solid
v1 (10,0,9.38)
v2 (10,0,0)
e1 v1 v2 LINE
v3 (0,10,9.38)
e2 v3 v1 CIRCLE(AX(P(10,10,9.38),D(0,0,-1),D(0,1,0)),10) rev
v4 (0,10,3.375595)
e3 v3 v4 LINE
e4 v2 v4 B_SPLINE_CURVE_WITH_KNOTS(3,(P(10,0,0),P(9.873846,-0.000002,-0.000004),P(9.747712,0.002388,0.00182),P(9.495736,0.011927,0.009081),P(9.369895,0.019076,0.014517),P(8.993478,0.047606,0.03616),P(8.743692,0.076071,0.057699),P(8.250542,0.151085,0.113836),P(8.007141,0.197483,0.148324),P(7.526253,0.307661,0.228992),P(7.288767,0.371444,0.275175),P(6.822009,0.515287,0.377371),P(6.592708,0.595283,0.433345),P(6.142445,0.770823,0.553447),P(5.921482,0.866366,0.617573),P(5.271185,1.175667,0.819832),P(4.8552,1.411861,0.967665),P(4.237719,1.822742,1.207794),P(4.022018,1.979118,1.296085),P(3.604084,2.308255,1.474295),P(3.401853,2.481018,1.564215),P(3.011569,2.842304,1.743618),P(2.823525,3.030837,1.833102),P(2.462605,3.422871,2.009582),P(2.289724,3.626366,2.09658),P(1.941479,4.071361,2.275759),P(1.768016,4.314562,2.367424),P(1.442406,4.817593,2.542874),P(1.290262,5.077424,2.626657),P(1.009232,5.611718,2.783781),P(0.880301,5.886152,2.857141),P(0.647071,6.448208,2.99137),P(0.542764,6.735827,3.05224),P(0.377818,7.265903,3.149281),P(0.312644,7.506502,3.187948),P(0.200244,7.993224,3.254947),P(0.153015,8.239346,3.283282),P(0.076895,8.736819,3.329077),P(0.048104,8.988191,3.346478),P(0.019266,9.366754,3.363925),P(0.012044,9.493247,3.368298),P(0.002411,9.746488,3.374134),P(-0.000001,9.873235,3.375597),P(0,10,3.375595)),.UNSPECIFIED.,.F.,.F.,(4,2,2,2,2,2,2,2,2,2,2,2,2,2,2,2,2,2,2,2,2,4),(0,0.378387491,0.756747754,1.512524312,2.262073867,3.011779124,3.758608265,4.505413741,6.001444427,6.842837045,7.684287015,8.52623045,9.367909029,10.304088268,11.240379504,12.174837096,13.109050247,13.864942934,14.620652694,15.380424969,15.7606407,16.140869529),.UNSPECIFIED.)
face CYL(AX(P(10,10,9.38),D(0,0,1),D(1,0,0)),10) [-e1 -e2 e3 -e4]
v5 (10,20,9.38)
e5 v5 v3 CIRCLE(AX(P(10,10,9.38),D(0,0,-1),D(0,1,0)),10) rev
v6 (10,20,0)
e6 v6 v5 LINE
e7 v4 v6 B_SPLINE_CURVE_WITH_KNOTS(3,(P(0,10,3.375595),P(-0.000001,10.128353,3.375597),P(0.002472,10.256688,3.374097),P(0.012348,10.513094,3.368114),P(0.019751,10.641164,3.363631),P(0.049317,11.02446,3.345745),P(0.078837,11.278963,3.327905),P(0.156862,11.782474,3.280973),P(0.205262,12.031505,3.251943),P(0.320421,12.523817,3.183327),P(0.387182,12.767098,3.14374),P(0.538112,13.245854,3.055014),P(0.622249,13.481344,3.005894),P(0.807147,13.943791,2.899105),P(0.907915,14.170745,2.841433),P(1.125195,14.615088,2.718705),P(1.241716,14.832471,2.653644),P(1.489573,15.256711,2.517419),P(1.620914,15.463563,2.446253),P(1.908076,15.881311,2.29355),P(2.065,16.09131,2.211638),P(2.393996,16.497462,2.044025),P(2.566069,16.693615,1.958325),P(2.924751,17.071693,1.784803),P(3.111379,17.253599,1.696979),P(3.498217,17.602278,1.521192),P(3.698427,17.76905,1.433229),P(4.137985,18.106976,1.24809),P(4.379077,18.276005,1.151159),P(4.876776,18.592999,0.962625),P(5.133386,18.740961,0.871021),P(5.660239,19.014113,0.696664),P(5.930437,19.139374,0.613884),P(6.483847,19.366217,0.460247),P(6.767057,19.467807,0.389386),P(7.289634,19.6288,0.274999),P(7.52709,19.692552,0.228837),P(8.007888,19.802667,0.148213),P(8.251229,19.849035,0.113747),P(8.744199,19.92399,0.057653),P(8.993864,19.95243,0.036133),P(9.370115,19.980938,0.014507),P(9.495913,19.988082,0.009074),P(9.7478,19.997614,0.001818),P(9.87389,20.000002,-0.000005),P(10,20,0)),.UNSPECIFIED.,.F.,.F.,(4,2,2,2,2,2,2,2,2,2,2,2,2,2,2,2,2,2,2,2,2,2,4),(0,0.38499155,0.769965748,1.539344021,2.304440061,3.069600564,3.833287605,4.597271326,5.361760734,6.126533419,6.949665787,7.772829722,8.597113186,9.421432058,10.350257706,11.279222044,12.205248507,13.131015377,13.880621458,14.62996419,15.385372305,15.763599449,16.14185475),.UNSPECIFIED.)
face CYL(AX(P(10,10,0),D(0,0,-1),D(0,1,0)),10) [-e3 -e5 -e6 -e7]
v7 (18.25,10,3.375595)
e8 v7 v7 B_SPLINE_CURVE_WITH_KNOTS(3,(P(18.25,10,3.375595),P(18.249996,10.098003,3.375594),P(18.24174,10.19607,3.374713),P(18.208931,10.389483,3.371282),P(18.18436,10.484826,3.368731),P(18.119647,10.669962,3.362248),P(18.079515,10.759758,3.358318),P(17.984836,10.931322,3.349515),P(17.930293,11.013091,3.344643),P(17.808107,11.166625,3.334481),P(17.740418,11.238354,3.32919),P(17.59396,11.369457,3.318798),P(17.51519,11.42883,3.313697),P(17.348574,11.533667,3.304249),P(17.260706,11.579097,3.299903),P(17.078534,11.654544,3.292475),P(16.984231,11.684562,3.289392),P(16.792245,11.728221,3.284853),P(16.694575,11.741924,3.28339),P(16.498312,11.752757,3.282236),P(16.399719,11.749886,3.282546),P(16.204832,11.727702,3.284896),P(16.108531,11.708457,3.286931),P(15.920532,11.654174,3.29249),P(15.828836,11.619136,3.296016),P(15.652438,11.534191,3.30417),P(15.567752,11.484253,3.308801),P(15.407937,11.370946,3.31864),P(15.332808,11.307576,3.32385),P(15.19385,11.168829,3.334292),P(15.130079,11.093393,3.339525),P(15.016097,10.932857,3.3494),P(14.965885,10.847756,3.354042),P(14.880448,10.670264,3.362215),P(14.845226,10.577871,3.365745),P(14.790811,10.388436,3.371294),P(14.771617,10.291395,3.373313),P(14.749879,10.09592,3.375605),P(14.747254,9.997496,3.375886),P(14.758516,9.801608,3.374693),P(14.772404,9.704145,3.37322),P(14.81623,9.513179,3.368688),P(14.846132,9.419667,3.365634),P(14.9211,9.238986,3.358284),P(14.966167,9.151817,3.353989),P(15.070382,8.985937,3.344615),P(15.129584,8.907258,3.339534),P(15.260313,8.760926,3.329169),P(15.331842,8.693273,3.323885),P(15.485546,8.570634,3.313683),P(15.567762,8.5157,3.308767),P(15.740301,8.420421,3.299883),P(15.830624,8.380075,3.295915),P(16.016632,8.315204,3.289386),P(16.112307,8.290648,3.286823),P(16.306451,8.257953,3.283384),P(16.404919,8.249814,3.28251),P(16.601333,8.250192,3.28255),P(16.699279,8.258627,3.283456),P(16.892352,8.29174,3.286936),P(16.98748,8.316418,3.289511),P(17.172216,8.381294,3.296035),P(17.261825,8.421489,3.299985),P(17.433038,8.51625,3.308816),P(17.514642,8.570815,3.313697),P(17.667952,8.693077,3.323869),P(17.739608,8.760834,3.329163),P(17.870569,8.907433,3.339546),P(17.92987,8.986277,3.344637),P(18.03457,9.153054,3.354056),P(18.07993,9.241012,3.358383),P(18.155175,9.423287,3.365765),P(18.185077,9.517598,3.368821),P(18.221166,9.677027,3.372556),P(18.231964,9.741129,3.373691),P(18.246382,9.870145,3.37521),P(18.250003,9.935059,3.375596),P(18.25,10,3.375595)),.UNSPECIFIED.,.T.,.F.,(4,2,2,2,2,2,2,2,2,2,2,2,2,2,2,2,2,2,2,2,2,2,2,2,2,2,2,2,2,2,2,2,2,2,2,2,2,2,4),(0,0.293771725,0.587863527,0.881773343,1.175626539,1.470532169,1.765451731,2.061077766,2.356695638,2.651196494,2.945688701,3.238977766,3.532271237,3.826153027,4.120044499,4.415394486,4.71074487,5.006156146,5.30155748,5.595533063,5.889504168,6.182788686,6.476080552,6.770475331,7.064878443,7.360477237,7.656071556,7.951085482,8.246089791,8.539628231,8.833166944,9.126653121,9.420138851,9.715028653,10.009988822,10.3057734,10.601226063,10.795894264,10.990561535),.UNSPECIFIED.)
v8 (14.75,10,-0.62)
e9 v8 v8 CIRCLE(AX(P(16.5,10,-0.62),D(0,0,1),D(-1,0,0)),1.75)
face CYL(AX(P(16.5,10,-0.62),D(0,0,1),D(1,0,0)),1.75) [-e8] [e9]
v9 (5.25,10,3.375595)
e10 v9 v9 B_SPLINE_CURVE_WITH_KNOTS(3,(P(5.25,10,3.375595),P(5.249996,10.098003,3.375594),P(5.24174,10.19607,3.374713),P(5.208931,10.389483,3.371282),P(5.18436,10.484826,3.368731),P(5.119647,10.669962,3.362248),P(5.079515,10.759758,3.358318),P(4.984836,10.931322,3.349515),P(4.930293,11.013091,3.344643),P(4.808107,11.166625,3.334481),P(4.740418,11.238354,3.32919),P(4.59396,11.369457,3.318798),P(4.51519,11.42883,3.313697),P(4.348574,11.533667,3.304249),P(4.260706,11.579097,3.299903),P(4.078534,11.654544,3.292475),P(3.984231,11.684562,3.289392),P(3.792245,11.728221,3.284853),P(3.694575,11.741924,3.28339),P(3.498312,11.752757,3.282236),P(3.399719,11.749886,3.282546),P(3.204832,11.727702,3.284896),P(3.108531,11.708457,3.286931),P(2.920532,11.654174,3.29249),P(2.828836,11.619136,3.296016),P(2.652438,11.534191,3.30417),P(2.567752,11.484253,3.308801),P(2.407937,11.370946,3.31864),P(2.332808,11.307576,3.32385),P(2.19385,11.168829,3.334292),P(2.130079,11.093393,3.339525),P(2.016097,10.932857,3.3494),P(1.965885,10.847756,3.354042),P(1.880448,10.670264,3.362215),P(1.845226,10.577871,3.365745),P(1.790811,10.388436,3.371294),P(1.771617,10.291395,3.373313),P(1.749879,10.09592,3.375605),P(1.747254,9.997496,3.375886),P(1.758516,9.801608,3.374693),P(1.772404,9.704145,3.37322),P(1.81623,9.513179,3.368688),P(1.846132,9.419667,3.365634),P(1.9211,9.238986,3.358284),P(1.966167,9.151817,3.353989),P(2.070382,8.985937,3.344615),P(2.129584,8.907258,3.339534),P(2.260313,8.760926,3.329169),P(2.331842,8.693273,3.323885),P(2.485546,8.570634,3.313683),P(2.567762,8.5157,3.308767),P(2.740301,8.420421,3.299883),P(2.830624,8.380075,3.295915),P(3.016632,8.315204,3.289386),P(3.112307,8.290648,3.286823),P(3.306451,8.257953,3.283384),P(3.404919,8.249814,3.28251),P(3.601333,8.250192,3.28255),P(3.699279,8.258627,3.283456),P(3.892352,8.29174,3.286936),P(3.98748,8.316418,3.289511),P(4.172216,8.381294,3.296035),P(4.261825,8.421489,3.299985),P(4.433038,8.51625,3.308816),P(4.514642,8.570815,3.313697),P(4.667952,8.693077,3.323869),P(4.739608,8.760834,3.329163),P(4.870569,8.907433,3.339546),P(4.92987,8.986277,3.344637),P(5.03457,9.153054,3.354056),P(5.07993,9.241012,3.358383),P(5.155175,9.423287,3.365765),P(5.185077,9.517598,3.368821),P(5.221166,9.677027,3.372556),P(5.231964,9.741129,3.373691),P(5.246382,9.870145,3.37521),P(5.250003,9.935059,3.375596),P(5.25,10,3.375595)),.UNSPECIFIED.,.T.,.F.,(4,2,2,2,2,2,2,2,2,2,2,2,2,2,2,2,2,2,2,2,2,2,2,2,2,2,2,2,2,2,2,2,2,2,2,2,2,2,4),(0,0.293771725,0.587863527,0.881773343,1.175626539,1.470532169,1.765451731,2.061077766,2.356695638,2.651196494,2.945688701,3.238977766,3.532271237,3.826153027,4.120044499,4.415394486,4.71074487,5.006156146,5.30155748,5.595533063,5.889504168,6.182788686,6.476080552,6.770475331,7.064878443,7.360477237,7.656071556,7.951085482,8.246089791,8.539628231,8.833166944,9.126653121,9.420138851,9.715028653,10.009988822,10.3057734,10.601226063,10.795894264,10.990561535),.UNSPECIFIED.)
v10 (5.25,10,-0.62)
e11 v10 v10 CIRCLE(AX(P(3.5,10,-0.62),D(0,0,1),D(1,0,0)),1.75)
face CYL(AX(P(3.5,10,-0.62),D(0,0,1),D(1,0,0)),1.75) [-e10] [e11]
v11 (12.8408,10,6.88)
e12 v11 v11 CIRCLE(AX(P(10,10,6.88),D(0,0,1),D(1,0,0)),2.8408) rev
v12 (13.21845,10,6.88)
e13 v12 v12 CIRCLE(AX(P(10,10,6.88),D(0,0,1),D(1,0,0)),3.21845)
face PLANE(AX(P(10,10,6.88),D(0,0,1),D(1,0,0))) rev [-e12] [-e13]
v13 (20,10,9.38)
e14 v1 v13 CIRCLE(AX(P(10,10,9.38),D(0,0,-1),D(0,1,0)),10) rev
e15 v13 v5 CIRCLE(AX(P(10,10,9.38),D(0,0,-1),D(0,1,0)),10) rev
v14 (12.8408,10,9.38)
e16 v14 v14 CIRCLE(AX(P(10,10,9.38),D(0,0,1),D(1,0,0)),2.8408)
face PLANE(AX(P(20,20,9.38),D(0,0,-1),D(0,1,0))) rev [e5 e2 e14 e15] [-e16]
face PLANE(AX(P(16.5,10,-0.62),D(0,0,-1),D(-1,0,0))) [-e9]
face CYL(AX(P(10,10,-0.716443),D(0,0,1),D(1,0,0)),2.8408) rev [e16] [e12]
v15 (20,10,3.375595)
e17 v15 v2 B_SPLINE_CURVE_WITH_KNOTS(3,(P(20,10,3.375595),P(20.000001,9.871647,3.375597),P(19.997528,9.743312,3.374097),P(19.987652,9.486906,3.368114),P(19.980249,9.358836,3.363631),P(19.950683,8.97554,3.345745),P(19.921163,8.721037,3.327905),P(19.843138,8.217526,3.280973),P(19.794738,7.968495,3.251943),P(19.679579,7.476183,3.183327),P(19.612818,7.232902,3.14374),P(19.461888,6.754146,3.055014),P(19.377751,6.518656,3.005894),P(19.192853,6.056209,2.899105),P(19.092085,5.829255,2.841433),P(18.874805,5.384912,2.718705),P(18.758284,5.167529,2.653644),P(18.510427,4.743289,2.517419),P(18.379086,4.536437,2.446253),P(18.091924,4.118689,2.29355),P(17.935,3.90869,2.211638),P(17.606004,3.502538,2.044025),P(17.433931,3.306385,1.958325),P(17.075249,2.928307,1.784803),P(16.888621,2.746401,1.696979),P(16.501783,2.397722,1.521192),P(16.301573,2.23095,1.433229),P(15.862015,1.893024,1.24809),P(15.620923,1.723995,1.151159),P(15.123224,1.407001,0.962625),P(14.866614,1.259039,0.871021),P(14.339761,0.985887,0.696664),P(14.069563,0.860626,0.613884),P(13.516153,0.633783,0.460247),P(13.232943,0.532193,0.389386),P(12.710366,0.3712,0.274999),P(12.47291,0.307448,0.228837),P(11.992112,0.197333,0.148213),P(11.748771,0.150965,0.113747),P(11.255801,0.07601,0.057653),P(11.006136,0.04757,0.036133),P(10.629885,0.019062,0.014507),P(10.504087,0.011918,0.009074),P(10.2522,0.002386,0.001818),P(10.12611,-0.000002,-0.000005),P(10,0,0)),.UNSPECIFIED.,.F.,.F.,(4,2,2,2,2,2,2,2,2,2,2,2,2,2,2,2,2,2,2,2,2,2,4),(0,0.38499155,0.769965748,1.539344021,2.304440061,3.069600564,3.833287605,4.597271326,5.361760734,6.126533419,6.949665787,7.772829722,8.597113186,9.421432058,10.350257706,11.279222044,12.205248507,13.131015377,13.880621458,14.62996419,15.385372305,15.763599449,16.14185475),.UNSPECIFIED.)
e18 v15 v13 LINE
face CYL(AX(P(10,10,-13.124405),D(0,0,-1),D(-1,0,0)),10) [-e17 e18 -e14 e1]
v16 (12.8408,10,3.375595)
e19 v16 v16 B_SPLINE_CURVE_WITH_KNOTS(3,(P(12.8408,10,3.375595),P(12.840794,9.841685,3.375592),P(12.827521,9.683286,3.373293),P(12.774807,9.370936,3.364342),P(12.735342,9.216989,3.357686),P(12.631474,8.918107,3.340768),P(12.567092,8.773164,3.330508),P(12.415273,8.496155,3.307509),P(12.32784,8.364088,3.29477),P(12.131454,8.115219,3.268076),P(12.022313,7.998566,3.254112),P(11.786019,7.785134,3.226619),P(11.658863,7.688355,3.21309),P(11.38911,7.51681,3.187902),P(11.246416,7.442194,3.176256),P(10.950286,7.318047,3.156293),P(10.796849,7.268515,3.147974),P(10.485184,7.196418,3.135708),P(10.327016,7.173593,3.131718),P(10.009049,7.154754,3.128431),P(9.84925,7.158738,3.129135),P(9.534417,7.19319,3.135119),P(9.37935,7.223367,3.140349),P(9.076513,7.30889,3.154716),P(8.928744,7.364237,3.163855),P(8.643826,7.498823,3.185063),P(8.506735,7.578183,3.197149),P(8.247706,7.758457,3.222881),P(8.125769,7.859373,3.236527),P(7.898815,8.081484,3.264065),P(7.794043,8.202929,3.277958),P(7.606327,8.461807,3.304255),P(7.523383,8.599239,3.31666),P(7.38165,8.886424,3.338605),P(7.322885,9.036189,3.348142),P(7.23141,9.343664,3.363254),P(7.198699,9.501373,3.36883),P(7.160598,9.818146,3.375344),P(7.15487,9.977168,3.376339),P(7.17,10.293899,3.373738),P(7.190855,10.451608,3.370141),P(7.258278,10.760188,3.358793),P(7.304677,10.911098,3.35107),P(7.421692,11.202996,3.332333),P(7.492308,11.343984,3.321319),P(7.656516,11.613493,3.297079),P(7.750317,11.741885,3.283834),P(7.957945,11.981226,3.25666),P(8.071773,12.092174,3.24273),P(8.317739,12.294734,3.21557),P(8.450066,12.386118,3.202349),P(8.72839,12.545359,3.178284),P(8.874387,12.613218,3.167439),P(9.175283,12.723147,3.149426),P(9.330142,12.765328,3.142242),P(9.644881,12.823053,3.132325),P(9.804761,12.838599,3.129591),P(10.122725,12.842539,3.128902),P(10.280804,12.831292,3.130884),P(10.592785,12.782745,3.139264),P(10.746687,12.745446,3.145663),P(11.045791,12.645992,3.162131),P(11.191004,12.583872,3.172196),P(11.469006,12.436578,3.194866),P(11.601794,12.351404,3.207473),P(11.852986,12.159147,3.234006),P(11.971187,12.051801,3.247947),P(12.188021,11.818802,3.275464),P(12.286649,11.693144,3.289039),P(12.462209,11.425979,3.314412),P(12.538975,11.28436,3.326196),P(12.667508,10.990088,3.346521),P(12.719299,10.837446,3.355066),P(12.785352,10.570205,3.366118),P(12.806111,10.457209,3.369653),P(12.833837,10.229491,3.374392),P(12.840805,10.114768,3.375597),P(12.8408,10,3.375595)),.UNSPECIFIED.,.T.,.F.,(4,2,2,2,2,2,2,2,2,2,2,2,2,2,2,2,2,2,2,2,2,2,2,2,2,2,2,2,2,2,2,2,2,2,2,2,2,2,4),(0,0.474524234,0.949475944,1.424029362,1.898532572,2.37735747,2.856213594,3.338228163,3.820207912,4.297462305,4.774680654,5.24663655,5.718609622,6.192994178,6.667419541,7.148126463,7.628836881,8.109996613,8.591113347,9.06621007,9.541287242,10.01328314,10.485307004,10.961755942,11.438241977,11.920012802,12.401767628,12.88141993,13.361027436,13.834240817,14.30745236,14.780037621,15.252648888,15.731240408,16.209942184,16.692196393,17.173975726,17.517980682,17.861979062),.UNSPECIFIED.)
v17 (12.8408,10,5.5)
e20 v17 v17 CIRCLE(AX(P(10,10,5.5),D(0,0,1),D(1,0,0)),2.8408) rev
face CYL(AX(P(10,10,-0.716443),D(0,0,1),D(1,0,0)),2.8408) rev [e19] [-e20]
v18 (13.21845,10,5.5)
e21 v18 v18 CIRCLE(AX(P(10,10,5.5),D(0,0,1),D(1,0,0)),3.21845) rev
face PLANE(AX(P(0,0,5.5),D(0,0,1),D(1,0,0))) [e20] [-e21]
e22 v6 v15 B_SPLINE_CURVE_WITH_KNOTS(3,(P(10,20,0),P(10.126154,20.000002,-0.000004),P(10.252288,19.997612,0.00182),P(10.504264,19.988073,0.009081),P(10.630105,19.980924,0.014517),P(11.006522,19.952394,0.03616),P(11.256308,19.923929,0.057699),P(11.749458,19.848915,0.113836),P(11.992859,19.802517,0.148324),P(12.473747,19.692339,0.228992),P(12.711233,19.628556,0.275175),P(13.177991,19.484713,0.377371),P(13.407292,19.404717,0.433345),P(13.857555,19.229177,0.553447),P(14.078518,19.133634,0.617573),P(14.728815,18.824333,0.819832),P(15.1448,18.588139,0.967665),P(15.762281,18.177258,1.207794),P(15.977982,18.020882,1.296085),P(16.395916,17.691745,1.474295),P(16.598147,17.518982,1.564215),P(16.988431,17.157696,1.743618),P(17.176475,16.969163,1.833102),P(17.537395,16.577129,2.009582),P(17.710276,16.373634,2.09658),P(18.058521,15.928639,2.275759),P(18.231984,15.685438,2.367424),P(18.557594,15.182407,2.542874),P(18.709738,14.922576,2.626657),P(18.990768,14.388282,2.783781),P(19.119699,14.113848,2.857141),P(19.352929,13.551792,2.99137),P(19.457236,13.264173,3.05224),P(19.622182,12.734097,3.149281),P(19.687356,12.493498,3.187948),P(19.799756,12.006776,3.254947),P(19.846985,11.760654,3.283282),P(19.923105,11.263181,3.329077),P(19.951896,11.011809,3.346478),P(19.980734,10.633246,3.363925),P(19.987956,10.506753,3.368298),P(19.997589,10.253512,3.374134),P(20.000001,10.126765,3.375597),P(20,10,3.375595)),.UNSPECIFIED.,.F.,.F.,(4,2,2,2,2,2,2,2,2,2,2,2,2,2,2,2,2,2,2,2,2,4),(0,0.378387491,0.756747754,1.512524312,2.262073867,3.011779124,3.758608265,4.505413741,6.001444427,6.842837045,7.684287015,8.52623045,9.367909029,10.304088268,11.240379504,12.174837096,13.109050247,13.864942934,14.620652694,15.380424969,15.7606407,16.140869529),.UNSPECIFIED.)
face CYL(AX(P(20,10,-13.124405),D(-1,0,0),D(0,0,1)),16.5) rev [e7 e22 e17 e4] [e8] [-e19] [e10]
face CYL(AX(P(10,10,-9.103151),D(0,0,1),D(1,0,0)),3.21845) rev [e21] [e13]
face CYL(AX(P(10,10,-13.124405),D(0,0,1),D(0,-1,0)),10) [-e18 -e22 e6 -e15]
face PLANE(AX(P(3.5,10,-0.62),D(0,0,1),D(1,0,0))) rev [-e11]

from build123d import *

# Parameters (mm, degrees)
BOSS_EXTRUDE2_DEPTH     = 20
FILLET1_R               = 10
CUT_EXTRUDE2_REACH      = 31.799
CUT_EXTRUDE2_END_RADIUS = 16.5
SKETCH4_R               = 2.8408
CUT_EXTRUDE3_START      = -2.5
SKETCH5_R               = 3.21845
CUT_EXTRUDE3_DEPTH      = 1.38
BOSS_EXTRUDE3_START     = -6
SKETCH6_R               = 1.75
BOSS_EXTRUDE3_DEPTH     = 4


with BuildPart() as part:
    # Sketch3 → Boss-Extrude2 (new body)
    with BuildSketch(Plane(origin=(0, 0, 0), x_dir=(0, 0, -1), z_dir=(1, 0, 0))):
        with BuildLine():
            Line((0, 20), (-9.38, 20))
            Line((-9.38, 20), (-9.38, 0))
            Line((-9.38, 0), (0, 0))
            ThreePointArc((0, 0), (-3.375595252, 10), (0, 20))
        make_face()
    extrude(amount=BOSS_EXTRUDE2_DEPTH)

    # Fillet1
    fillet1_edges = [part.edges().sort_by_distance(p)[0] for p in [
        (20, 0, 4.69),
        (0, 0, 4.69),
        (20, 20, 4.69),
        (0, 20, 4.69),
    ]]
    fillet(fillet1_edges, radius=FILLET1_R - 0.0001)  # a hair under: the kernel refuses the full size

    # Cut-Extrude2: up to this cylinder (the profile starts outside it)
    cut_extrude2_end = Plane(origin=(10, 10, -13.124404748), z_dir=(-1, 0, 0)) * Cylinder(CUT_EXTRUDE2_END_RADIUS, 97.598, mode=Mode.PRIVATE)
    # Sketch4 → Cut-Extrude2 (cut, up to the surface)
    with BuildSketch(Plane.XY.offset(9.38), mode=Mode.PRIVATE) as cut_extrude2_sk1:
        with Locations((10, 10)):
            Circle(SKETCH4_R)
    cut_extrude2_tool1 = extrude(cut_extrude2_sk1.sketch, amount=-CUT_EXTRUDE2_REACH, mode=Mode.PRIVATE) - cut_extrude2_end
    add(cut_extrude2_tool1.solids().sort_by_distance((10, 10, 9.38))[0], mode=Mode.SUBTRACT)

    # Sketch5 → Cut-Extrude3 (cut)
    with BuildSketch(Plane.XY.offset(9.38).offset(CUT_EXTRUDE3_START)):
        with Locations((10, 10)):
            Circle(SKETCH5_R)
    extrude(amount=-CUT_EXTRUDE3_DEPTH, mode=Mode.SUBTRACT)

    # Sketch6 → Boss-Extrude3 (add)
    with BuildSketch(Plane.XY.offset(9.38).offset(BOSS_EXTRUDE3_START)):
        with Locations((3.5, 10)):
            Circle(SKETCH6_R)
        with Locations((16.5, 10)):
            Circle(SKETCH6_R)
    extrude(amount=-BOSS_EXTRUDE3_DEPTH)


solid = part.part
